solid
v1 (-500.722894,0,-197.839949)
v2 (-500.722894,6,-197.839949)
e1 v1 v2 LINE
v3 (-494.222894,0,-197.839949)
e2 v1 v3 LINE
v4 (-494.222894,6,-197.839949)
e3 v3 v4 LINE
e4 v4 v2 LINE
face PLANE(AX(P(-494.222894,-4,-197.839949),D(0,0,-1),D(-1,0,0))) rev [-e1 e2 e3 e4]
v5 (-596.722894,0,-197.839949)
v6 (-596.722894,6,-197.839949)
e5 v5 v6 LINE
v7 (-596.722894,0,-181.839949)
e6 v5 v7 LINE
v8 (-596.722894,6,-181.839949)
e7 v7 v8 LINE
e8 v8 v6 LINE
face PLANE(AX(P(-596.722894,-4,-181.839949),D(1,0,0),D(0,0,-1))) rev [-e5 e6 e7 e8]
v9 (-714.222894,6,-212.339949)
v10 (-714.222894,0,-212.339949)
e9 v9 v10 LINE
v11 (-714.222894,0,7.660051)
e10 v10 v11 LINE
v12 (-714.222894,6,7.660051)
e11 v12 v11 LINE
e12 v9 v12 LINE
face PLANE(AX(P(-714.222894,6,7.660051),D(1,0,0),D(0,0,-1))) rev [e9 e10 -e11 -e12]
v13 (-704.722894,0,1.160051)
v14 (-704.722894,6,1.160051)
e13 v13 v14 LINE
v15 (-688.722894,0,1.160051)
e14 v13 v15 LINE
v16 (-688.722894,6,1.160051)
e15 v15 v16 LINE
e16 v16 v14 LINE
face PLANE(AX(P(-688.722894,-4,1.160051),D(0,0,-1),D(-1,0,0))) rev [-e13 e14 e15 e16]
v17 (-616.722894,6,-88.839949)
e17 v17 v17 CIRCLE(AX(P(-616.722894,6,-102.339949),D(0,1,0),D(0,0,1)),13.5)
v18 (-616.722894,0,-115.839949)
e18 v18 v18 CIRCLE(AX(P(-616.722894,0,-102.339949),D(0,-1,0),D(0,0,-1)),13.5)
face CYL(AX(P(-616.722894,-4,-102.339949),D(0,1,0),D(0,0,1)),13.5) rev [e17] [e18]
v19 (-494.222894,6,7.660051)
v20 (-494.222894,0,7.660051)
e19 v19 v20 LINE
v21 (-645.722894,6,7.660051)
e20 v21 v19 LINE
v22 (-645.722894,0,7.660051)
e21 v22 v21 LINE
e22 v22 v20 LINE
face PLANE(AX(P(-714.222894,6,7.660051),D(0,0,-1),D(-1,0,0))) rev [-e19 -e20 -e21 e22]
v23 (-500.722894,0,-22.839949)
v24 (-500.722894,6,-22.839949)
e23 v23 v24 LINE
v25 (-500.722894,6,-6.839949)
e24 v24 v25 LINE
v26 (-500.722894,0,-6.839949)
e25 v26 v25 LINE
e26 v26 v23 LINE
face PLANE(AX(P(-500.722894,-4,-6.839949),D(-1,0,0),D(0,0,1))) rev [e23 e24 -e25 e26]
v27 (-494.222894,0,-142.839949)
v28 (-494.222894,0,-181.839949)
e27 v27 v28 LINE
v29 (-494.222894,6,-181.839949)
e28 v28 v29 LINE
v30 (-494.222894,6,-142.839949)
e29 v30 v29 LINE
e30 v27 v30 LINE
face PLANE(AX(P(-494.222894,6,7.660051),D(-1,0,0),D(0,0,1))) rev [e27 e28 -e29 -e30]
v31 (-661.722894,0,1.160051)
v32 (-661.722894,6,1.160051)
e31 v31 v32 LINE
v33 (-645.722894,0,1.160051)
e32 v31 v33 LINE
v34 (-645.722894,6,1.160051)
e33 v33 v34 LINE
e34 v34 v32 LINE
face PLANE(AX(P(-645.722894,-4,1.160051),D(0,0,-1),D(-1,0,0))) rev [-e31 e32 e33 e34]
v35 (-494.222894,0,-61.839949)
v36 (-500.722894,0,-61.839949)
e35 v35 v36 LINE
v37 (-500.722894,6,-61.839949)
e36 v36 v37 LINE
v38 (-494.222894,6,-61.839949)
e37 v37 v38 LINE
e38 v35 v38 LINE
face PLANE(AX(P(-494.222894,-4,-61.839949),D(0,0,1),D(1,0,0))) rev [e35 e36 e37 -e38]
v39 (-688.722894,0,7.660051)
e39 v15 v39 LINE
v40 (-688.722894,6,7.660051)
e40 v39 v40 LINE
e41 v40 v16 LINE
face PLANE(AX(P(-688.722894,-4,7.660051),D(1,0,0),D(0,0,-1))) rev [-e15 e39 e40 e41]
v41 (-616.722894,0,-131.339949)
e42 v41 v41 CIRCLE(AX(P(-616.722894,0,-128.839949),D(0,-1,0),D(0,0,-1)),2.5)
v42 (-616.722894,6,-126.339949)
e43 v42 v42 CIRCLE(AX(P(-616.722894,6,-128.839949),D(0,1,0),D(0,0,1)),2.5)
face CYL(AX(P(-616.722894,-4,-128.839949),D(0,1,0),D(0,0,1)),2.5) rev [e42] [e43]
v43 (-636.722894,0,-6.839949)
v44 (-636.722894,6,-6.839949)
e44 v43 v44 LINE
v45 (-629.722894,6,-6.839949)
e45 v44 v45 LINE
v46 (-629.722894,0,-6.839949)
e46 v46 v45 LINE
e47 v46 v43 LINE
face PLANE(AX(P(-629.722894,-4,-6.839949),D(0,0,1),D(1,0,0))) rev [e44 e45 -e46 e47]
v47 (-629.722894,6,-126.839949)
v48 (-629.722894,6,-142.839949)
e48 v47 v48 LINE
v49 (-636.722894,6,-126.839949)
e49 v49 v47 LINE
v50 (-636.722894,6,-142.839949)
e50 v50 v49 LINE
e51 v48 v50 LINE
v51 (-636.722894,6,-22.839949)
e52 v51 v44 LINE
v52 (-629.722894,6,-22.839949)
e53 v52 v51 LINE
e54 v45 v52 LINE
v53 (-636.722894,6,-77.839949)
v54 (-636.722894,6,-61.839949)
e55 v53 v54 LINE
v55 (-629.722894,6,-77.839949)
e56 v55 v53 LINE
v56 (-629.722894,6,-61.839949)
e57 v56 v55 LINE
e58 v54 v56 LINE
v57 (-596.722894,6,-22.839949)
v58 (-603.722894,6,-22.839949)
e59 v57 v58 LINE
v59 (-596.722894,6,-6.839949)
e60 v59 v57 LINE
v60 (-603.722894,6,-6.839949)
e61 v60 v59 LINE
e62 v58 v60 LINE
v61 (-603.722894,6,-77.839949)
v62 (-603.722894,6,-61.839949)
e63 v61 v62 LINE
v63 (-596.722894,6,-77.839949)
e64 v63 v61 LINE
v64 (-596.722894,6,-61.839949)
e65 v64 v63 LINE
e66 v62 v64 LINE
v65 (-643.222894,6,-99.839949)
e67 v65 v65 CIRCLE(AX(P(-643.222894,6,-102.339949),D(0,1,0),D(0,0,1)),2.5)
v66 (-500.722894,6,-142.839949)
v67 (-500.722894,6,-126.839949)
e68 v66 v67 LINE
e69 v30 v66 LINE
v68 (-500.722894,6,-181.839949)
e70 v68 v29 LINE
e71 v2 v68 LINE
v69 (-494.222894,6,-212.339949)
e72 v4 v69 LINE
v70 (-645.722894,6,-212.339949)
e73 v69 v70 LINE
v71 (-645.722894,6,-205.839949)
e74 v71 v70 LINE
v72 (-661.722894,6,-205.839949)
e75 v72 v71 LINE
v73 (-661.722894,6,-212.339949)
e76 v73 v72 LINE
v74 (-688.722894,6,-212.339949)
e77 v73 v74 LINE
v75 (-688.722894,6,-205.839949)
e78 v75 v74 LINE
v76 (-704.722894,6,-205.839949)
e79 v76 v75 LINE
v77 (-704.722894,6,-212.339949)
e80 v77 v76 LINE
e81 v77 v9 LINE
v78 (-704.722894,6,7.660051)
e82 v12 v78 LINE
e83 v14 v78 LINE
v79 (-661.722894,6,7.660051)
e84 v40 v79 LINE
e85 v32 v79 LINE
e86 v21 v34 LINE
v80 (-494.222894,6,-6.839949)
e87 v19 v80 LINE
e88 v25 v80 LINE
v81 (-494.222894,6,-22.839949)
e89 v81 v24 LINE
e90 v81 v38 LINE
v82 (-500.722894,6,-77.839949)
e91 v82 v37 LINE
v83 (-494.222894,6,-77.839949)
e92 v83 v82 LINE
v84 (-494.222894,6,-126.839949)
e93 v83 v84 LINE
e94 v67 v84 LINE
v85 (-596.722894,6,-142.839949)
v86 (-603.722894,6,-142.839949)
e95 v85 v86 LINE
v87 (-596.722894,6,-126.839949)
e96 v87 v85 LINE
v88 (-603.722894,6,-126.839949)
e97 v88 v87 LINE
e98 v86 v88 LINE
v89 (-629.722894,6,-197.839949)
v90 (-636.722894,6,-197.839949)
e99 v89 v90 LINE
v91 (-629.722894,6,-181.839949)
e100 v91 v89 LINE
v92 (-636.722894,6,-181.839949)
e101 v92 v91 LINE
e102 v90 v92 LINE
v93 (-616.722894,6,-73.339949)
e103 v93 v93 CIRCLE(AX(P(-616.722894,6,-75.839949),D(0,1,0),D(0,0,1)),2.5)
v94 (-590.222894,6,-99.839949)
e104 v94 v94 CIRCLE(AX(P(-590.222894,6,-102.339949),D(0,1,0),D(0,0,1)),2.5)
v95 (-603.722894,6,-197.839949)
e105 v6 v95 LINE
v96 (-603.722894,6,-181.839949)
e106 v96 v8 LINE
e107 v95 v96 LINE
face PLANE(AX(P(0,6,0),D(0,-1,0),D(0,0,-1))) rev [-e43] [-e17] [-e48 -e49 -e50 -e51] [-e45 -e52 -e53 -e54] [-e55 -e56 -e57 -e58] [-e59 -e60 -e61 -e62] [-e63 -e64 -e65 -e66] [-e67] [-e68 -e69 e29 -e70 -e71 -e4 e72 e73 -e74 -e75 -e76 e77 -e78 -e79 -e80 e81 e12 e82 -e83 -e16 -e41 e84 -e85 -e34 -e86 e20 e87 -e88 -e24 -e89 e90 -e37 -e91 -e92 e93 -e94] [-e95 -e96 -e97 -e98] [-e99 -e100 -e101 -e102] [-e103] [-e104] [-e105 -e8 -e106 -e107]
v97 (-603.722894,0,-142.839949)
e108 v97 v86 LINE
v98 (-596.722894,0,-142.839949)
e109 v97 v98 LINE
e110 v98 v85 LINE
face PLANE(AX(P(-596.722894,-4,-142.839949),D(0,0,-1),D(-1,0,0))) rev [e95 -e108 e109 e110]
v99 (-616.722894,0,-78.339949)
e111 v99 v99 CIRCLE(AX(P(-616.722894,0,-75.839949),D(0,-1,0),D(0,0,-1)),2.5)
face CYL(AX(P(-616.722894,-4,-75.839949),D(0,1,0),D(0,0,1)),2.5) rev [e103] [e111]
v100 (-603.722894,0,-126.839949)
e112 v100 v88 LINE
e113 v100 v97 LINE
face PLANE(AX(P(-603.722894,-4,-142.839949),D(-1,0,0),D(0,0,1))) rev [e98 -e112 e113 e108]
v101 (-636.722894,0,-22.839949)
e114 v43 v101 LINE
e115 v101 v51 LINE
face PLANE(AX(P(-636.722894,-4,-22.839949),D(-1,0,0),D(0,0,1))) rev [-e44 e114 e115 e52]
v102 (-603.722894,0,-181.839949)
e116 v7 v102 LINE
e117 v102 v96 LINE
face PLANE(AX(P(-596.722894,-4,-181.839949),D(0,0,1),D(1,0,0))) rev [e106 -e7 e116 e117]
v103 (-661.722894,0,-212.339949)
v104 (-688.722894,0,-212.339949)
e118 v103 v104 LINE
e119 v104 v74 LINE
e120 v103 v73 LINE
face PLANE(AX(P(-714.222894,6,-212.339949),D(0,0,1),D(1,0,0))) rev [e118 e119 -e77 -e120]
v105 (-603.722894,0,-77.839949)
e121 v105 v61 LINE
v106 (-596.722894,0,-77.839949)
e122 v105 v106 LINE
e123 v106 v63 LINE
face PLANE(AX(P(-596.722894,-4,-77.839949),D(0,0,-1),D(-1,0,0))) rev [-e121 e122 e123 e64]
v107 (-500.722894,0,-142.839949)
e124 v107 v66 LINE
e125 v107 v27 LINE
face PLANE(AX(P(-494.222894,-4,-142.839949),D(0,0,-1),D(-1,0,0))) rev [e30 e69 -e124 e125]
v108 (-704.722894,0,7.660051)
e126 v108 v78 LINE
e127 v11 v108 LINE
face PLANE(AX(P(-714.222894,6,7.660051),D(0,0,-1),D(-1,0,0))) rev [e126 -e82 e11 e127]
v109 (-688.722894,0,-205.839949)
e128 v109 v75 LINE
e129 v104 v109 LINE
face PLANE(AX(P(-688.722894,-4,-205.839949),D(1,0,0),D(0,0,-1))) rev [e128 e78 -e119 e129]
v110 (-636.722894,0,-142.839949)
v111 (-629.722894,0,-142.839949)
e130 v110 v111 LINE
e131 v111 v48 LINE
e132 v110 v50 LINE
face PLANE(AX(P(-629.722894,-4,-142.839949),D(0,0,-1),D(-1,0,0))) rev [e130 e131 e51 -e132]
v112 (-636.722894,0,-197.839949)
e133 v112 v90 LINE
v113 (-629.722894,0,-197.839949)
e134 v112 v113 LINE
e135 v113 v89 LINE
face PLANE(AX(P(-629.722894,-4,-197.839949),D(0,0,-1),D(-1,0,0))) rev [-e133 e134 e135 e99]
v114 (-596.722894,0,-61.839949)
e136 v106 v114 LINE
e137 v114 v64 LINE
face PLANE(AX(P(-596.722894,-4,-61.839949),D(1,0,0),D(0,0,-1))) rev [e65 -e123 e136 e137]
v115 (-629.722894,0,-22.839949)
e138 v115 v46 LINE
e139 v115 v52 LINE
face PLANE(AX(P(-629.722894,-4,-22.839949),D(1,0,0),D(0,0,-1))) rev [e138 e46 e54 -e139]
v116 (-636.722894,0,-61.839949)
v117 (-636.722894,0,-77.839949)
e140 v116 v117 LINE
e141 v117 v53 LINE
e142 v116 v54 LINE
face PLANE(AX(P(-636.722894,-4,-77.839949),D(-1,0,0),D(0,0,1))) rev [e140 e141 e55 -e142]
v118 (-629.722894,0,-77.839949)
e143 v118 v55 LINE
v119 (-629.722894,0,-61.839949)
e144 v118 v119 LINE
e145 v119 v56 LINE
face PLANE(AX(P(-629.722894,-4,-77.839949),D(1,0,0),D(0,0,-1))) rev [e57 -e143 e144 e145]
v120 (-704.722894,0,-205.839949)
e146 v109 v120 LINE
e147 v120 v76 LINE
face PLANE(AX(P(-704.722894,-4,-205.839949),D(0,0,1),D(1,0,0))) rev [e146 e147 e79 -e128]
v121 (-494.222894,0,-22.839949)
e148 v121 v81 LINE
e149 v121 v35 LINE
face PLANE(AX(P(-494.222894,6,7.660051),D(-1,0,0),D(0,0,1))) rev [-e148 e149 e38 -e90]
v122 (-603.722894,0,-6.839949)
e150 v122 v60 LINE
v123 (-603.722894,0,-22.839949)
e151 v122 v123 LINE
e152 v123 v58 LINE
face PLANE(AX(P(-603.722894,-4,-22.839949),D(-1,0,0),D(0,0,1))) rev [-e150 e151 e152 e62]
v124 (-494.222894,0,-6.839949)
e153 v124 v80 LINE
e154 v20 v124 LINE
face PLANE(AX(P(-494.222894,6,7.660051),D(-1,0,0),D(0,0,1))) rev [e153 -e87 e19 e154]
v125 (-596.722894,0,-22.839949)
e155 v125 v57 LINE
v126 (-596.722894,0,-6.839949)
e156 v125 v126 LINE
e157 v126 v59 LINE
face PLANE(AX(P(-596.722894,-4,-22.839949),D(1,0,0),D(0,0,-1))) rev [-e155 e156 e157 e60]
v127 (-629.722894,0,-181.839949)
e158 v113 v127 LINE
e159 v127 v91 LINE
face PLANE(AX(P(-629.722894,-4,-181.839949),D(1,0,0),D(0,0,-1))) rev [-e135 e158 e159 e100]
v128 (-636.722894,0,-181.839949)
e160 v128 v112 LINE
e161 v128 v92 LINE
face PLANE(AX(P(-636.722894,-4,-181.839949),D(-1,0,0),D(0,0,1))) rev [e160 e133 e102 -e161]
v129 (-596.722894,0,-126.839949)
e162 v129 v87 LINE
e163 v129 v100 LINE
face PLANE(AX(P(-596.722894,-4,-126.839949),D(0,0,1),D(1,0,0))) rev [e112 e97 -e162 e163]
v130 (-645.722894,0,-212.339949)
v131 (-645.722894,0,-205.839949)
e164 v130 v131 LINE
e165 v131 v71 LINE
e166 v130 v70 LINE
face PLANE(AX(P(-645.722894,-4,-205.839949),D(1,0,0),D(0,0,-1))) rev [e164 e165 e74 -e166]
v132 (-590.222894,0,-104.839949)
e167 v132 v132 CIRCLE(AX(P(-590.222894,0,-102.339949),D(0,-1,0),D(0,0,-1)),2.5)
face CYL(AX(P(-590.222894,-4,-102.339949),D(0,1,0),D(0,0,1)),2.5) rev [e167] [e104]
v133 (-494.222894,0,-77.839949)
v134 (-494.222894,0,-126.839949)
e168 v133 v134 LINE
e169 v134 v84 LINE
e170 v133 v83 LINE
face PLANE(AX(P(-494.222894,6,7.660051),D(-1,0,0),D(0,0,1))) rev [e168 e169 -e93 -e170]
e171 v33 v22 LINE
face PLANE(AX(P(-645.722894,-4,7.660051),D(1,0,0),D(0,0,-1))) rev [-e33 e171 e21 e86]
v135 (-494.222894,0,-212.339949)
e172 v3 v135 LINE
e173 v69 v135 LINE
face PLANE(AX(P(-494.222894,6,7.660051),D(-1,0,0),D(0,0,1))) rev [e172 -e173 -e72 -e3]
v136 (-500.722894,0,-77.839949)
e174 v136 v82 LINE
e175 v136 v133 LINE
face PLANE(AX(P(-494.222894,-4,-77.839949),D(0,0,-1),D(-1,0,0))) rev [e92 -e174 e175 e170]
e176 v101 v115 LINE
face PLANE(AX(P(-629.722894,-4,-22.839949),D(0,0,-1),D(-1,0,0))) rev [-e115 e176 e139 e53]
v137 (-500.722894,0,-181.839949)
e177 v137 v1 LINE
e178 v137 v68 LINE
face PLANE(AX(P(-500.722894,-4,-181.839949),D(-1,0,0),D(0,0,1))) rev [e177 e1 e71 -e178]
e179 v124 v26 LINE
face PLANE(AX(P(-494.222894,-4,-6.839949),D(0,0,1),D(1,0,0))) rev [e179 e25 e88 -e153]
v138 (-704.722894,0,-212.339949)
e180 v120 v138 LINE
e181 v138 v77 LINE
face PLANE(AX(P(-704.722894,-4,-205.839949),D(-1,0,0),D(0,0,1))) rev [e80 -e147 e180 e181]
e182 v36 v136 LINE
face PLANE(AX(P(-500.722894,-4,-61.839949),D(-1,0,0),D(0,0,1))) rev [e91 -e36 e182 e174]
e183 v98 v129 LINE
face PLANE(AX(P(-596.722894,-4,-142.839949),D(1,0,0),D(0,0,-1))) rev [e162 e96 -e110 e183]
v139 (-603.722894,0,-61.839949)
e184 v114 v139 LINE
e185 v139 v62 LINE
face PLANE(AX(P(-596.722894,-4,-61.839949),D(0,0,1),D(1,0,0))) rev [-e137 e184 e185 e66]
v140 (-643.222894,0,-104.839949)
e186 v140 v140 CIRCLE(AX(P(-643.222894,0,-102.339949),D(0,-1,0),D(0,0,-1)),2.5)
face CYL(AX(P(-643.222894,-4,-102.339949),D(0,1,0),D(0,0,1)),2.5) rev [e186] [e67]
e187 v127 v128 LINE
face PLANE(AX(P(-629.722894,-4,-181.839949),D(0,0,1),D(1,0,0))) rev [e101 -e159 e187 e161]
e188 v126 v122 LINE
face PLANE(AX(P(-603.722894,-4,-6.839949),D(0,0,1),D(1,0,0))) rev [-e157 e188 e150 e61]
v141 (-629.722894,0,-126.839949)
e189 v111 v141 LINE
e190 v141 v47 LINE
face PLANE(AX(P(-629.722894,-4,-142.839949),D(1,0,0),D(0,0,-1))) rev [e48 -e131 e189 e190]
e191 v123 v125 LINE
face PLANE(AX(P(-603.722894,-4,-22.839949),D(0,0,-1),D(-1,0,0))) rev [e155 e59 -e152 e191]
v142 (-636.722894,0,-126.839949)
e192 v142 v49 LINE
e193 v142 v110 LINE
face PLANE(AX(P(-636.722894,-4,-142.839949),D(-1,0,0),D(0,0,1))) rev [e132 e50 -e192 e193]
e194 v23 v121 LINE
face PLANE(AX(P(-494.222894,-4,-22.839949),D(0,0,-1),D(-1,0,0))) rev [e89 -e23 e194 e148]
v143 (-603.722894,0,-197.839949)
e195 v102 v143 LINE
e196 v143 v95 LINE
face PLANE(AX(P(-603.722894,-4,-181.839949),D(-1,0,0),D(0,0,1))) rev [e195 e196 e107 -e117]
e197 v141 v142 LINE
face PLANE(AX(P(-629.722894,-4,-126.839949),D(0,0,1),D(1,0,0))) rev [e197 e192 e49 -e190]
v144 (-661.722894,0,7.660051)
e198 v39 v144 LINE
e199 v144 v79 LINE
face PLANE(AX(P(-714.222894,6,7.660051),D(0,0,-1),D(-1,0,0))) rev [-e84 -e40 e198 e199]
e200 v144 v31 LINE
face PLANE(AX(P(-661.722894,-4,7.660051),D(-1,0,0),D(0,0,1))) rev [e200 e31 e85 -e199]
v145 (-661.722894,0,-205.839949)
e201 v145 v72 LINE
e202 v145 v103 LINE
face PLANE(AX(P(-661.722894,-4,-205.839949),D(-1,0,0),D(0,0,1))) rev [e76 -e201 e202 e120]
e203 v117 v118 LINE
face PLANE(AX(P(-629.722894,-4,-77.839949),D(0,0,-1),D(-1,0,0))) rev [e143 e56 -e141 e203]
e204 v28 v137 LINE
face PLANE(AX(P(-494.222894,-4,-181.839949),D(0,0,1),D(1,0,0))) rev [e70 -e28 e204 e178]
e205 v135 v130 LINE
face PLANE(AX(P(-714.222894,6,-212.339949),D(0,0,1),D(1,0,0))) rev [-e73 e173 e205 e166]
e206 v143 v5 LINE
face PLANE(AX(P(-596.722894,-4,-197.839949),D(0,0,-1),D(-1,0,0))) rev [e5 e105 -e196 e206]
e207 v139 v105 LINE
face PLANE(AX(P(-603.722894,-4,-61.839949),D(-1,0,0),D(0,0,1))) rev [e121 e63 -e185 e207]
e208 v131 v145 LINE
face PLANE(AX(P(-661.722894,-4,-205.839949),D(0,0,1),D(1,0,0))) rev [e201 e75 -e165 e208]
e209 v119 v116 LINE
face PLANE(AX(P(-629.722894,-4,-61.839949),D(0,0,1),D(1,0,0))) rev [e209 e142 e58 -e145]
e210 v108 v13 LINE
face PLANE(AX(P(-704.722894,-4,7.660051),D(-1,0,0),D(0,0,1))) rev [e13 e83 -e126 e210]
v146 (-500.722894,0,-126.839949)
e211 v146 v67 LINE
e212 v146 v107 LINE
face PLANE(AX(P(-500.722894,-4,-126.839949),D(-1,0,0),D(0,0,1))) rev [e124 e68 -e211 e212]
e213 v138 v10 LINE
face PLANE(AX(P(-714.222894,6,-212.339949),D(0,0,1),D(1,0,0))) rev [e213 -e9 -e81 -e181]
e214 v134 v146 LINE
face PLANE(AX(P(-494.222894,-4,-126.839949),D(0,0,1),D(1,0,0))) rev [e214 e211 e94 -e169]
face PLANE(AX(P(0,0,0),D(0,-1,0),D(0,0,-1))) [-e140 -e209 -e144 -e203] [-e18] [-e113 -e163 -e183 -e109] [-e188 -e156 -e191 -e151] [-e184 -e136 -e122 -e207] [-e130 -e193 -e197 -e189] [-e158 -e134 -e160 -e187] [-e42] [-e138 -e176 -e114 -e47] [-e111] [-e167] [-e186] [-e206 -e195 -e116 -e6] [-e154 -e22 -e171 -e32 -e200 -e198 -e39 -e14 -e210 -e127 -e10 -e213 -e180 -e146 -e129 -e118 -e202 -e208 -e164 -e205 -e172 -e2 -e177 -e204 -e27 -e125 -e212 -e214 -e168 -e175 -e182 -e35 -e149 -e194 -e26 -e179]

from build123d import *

# Parameters (mm, degrees)
SKETCH2_W           = 220
SKETCH2_H           = 220
BOSS_EXTRUDE1_DEPTH = 6
SKETCH3_R           = 13.5
CUT_EXTRUDE1_DEPTH  = 10
SKETCH4_R           = 2.5
CUT_EXTRUDE2_DEPTH  = 10
CAVITY1_START       = -197.339948834
CAVITY1_OUTLINE_W   = 6
CAVITY1_OUTLINE_H   = 6
CAVITY1_DEPTH       = 15
CAVITY1_START_2     = -142.339948834
CAVITY1_2_OUTLINE_W = 6
CAVITY1_2_OUTLINE_H = 6
CAVITY1_2_DEPTH     = 15
CAVITY1_START_3     = -77.339948834
CAVITY1_3_OUTLINE_W = 6
CAVITY1_3_OUTLINE_H = 6
CAVITY1_3_DEPTH     = 15
CAVITY1_START_4     = -22.339948834
CAVITY1_4_OUTLINE_W = 6
CAVITY1_4_OUTLINE_H = 6
CAVITY1_4_DEPTH     = 15
CAVITY1_START_5     = -212.339948834
CAVITY1_5_OUTLINE_W = 15
CAVITY1_5_OUTLINE_H = 6
CAVITY1_5_DEPTH     = 6
CAVITY1_START_6     = 1.660051166
CAVITY1_6_OUTLINE_W = 15
CAVITY1_6_OUTLINE_H = 6
CAVITY1_6_DEPTH     = 6
SKETCH5_W           = 6.5
SKETCH5_H           = 16
SKETCH5_W_2         = 7
SKETCH5_W_3         = 16
SKETCH5_H_2         = 6.5
CUT_EXTRUDE3_DEPTH  = 10


# Read off the part's stored shape, not the designer's step: Cavity1
with BuildPart() as part:
    # Sketch2 → Boss-Extrude1 (new body)
    with BuildSketch(Plane(origin=(0, 0, 0), x_dir=(1, 0, 0), z_dir=(0, 1, 0))):
        with Locations((-604.222894392, 102.339948834)):
            Rectangle(SKETCH2_W, SKETCH2_H)
    extrude(amount=BOSS_EXTRUDE1_DEPTH)

    # Sketch3 → Cut-Extrude1 (cut)
    with BuildSketch(Plane(origin=(0, 6, 0), x_dir=(1, 0, 0), z_dir=(0, 1, 0))):
        with Locations(Location((-616.722894392, 102.339948834, 0), (0, 0, 270))):
            Circle(SKETCH3_R)
    extrude(amount=-CUT_EXTRUDE1_DEPTH, mode=Mode.SUBTRACT)

    # Sketch4 → Cut-Extrude2 (cut)
    with BuildSketch(Plane(origin=(0, 6, 0), x_dir=(1, 0, 0), z_dir=(0, 1, 0))):
        with Locations(Location((-590.222894392, 102.339948834, 0), (0, 0, 270))):
            Circle(SKETCH4_R)
        with Locations(Location((-616.722894392, 128.839948834, 0), (0, 0, 270))):
            Circle(SKETCH4_R)
        with Locations(Location((-643.222894392, 102.339948834, 0), (0, 0, 270))):
            Circle(SKETCH4_R)
        with Locations(Location((-616.722894392, 75.839948834, 0), (0, 0, 270))):
            Circle(SKETCH4_R)
    extrude(amount=-CUT_EXTRUDE2_DEPTH, mode=Mode.SUBTRACT)

    # Cavity1 outline → Cavity1 (cut)
    with BuildSketch(Plane.XY.offset(CAVITY1_START)):
        with Locations((-633.222894392, 3)):
            Rectangle(CAVITY1_OUTLINE_W, CAVITY1_OUTLINE_H)
        with Locations((-600.222894392, 3)):
            Rectangle(CAVITY1_OUTLINE_W, CAVITY1_OUTLINE_H)
        with Locations((-497.222894392, 3)):
            Rectangle(CAVITY1_OUTLINE_W, CAVITY1_OUTLINE_H)
    extrude(amount=CAVITY1_DEPTH, mode=Mode.SUBTRACT)

    # Cavity1 2 outline → Cavity1 2 (cut)
    with BuildSketch(Plane.XY.offset(CAVITY1_START_2)):
        with Locations((-633.222894392, 3)):
            Rectangle(CAVITY1_2_OUTLINE_W, CAVITY1_2_OUTLINE_H)
        with Locations((-600.222894392, 3)):
            Rectangle(CAVITY1_2_OUTLINE_W, CAVITY1_2_OUTLINE_H)
        with Locations((-497.222894392, 3)):
            Rectangle(CAVITY1_2_OUTLINE_W, CAVITY1_2_OUTLINE_H)
    extrude(amount=CAVITY1_2_DEPTH, mode=Mode.SUBTRACT)

    # Cavity1 3 outline → Cavity1 3 (cut)
    with BuildSketch(Plane.XY.offset(CAVITY1_START_3)):
        with Locations((-633.222894392, 3)):
            Rectangle(CAVITY1_3_OUTLINE_W, CAVITY1_3_OUTLINE_H)
        with Locations((-600.222894392, 3)):
            Rectangle(CAVITY1_3_OUTLINE_W, CAVITY1_3_OUTLINE_H)
        with Locations((-497.222894392, 3)):
            Rectangle(CAVITY1_3_OUTLINE_W, CAVITY1_3_OUTLINE_H)
    extrude(amount=CAVITY1_3_DEPTH, mode=Mode.SUBTRACT)

    # Cavity1 4 outline → Cavity1 4 (cut)
    with BuildSketch(Plane.XY.offset(CAVITY1_START_4)):
        with Locations((-633.222894392, 3)):
            Rectangle(CAVITY1_4_OUTLINE_W, CAVITY1_4_OUTLINE_H)
        with Locations((-600.222894392, 3)):
            Rectangle(CAVITY1_4_OUTLINE_W, CAVITY1_4_OUTLINE_H)
        with Locations((-497.222894392, 3)):
            Rectangle(CAVITY1_4_OUTLINE_W, CAVITY1_4_OUTLINE_H)
    extrude(amount=CAVITY1_4_DEPTH, mode=Mode.SUBTRACT)

    # Cavity1 5 outline → Cavity1 5 (cut)
    with BuildSketch(Plane.XY.offset(CAVITY1_START_5)):
        with Locations((-653.722894392, 3)):
            Rectangle(CAVITY1_5_OUTLINE_W, CAVITY1_5_OUTLINE_H)
        with Locations((-696.722894392, 3)):
            Rectangle(CAVITY1_5_OUTLINE_W, CAVITY1_5_OUTLINE_H)
    extrude(amount=CAVITY1_5_DEPTH, mode=Mode.SUBTRACT)

    # Cavity1 6 outline → Cavity1 6 (cut)
    with BuildSketch(Plane.XY.offset(CAVITY1_START_6)):
        with Locations((-653.722894392, 3)):
            Rectangle(CAVITY1_6_OUTLINE_W, CAVITY1_6_OUTLINE_H)
        with Locations((-696.722894392, 3)):
            Rectangle(CAVITY1_6_OUTLINE_W, CAVITY1_6_OUTLINE_H)
    extrude(amount=CAVITY1_6_DEPTH, mode=Mode.SUBTRACT)

    # Sketch5 → Cut-Extrude3 (cut)
    with BuildSketch(Plane(origin=(0, 6, 0), x_dir=(1, 0, 0), z_dir=(0, 1, 0))):
        with Locations((-497.472894392, 14.839948834)):
            Rectangle(SKETCH5_W, SKETCH5_H)
        with Locations((-497.472894392, 69.839948834)):
            Rectangle(SKETCH5_W, SKETCH5_H)
        with Locations((-497.472894392, 134.839948834)):
            Rectangle(SKETCH5_W, SKETCH5_H)
        with Locations((-497.472894392, 189.839948834)):
            Rectangle(SKETCH5_W, SKETCH5_H)
        with Locations((-600.222894392, 189.839948834)):
            Rectangle(SKETCH5_W_2, SKETCH5_H)
        with Locations((-633.222894392, 189.839948834)):
            Rectangle(SKETCH5_W_2, SKETCH5_H)
        with Locations((-600.222894392, 134.839948834)):
            Rectangle(SKETCH5_W_2, SKETCH5_H)
        with Locations((-600.222894392, 69.839948834)):
            Rectangle(SKETCH5_W_2, SKETCH5_H)
        with Locations((-600.222894392, 14.839948834)):
            Rectangle(SKETCH5_W_2, SKETCH5_H)
        with Locations((-633.222894392, 134.839948834)):
            Rectangle(SKETCH5_W_2, SKETCH5_H)
        with Locations((-633.222894392, 69.839948834)):
            Rectangle(SKETCH5_W_2, SKETCH5_H)
        with Locations((-633.222894392, 14.839948834)):
            Rectangle(SKETCH5_W_2, SKETCH5_H)
        with Locations((-653.722894392, 209.089948834)):
            Rectangle(SKETCH5_W_3, SKETCH5_H_2)
        with Locations((-696.722894392, 209.089948834)):
            Rectangle(SKETCH5_W_3, SKETCH5_H_2)
        with Locations((-653.722894392, -4.410051166)):
            Rectangle(SKETCH5_W_3, SKETCH5_H_2)
        with Locations((-696.722894392, -4.410051166)):
            Rectangle(SKETCH5_W_3, SKETCH5_H_2)
    extrude(amount=-CUT_EXTRUDE3_DEPTH, mode=Mode.SUBTRACT)


solid = part.part
